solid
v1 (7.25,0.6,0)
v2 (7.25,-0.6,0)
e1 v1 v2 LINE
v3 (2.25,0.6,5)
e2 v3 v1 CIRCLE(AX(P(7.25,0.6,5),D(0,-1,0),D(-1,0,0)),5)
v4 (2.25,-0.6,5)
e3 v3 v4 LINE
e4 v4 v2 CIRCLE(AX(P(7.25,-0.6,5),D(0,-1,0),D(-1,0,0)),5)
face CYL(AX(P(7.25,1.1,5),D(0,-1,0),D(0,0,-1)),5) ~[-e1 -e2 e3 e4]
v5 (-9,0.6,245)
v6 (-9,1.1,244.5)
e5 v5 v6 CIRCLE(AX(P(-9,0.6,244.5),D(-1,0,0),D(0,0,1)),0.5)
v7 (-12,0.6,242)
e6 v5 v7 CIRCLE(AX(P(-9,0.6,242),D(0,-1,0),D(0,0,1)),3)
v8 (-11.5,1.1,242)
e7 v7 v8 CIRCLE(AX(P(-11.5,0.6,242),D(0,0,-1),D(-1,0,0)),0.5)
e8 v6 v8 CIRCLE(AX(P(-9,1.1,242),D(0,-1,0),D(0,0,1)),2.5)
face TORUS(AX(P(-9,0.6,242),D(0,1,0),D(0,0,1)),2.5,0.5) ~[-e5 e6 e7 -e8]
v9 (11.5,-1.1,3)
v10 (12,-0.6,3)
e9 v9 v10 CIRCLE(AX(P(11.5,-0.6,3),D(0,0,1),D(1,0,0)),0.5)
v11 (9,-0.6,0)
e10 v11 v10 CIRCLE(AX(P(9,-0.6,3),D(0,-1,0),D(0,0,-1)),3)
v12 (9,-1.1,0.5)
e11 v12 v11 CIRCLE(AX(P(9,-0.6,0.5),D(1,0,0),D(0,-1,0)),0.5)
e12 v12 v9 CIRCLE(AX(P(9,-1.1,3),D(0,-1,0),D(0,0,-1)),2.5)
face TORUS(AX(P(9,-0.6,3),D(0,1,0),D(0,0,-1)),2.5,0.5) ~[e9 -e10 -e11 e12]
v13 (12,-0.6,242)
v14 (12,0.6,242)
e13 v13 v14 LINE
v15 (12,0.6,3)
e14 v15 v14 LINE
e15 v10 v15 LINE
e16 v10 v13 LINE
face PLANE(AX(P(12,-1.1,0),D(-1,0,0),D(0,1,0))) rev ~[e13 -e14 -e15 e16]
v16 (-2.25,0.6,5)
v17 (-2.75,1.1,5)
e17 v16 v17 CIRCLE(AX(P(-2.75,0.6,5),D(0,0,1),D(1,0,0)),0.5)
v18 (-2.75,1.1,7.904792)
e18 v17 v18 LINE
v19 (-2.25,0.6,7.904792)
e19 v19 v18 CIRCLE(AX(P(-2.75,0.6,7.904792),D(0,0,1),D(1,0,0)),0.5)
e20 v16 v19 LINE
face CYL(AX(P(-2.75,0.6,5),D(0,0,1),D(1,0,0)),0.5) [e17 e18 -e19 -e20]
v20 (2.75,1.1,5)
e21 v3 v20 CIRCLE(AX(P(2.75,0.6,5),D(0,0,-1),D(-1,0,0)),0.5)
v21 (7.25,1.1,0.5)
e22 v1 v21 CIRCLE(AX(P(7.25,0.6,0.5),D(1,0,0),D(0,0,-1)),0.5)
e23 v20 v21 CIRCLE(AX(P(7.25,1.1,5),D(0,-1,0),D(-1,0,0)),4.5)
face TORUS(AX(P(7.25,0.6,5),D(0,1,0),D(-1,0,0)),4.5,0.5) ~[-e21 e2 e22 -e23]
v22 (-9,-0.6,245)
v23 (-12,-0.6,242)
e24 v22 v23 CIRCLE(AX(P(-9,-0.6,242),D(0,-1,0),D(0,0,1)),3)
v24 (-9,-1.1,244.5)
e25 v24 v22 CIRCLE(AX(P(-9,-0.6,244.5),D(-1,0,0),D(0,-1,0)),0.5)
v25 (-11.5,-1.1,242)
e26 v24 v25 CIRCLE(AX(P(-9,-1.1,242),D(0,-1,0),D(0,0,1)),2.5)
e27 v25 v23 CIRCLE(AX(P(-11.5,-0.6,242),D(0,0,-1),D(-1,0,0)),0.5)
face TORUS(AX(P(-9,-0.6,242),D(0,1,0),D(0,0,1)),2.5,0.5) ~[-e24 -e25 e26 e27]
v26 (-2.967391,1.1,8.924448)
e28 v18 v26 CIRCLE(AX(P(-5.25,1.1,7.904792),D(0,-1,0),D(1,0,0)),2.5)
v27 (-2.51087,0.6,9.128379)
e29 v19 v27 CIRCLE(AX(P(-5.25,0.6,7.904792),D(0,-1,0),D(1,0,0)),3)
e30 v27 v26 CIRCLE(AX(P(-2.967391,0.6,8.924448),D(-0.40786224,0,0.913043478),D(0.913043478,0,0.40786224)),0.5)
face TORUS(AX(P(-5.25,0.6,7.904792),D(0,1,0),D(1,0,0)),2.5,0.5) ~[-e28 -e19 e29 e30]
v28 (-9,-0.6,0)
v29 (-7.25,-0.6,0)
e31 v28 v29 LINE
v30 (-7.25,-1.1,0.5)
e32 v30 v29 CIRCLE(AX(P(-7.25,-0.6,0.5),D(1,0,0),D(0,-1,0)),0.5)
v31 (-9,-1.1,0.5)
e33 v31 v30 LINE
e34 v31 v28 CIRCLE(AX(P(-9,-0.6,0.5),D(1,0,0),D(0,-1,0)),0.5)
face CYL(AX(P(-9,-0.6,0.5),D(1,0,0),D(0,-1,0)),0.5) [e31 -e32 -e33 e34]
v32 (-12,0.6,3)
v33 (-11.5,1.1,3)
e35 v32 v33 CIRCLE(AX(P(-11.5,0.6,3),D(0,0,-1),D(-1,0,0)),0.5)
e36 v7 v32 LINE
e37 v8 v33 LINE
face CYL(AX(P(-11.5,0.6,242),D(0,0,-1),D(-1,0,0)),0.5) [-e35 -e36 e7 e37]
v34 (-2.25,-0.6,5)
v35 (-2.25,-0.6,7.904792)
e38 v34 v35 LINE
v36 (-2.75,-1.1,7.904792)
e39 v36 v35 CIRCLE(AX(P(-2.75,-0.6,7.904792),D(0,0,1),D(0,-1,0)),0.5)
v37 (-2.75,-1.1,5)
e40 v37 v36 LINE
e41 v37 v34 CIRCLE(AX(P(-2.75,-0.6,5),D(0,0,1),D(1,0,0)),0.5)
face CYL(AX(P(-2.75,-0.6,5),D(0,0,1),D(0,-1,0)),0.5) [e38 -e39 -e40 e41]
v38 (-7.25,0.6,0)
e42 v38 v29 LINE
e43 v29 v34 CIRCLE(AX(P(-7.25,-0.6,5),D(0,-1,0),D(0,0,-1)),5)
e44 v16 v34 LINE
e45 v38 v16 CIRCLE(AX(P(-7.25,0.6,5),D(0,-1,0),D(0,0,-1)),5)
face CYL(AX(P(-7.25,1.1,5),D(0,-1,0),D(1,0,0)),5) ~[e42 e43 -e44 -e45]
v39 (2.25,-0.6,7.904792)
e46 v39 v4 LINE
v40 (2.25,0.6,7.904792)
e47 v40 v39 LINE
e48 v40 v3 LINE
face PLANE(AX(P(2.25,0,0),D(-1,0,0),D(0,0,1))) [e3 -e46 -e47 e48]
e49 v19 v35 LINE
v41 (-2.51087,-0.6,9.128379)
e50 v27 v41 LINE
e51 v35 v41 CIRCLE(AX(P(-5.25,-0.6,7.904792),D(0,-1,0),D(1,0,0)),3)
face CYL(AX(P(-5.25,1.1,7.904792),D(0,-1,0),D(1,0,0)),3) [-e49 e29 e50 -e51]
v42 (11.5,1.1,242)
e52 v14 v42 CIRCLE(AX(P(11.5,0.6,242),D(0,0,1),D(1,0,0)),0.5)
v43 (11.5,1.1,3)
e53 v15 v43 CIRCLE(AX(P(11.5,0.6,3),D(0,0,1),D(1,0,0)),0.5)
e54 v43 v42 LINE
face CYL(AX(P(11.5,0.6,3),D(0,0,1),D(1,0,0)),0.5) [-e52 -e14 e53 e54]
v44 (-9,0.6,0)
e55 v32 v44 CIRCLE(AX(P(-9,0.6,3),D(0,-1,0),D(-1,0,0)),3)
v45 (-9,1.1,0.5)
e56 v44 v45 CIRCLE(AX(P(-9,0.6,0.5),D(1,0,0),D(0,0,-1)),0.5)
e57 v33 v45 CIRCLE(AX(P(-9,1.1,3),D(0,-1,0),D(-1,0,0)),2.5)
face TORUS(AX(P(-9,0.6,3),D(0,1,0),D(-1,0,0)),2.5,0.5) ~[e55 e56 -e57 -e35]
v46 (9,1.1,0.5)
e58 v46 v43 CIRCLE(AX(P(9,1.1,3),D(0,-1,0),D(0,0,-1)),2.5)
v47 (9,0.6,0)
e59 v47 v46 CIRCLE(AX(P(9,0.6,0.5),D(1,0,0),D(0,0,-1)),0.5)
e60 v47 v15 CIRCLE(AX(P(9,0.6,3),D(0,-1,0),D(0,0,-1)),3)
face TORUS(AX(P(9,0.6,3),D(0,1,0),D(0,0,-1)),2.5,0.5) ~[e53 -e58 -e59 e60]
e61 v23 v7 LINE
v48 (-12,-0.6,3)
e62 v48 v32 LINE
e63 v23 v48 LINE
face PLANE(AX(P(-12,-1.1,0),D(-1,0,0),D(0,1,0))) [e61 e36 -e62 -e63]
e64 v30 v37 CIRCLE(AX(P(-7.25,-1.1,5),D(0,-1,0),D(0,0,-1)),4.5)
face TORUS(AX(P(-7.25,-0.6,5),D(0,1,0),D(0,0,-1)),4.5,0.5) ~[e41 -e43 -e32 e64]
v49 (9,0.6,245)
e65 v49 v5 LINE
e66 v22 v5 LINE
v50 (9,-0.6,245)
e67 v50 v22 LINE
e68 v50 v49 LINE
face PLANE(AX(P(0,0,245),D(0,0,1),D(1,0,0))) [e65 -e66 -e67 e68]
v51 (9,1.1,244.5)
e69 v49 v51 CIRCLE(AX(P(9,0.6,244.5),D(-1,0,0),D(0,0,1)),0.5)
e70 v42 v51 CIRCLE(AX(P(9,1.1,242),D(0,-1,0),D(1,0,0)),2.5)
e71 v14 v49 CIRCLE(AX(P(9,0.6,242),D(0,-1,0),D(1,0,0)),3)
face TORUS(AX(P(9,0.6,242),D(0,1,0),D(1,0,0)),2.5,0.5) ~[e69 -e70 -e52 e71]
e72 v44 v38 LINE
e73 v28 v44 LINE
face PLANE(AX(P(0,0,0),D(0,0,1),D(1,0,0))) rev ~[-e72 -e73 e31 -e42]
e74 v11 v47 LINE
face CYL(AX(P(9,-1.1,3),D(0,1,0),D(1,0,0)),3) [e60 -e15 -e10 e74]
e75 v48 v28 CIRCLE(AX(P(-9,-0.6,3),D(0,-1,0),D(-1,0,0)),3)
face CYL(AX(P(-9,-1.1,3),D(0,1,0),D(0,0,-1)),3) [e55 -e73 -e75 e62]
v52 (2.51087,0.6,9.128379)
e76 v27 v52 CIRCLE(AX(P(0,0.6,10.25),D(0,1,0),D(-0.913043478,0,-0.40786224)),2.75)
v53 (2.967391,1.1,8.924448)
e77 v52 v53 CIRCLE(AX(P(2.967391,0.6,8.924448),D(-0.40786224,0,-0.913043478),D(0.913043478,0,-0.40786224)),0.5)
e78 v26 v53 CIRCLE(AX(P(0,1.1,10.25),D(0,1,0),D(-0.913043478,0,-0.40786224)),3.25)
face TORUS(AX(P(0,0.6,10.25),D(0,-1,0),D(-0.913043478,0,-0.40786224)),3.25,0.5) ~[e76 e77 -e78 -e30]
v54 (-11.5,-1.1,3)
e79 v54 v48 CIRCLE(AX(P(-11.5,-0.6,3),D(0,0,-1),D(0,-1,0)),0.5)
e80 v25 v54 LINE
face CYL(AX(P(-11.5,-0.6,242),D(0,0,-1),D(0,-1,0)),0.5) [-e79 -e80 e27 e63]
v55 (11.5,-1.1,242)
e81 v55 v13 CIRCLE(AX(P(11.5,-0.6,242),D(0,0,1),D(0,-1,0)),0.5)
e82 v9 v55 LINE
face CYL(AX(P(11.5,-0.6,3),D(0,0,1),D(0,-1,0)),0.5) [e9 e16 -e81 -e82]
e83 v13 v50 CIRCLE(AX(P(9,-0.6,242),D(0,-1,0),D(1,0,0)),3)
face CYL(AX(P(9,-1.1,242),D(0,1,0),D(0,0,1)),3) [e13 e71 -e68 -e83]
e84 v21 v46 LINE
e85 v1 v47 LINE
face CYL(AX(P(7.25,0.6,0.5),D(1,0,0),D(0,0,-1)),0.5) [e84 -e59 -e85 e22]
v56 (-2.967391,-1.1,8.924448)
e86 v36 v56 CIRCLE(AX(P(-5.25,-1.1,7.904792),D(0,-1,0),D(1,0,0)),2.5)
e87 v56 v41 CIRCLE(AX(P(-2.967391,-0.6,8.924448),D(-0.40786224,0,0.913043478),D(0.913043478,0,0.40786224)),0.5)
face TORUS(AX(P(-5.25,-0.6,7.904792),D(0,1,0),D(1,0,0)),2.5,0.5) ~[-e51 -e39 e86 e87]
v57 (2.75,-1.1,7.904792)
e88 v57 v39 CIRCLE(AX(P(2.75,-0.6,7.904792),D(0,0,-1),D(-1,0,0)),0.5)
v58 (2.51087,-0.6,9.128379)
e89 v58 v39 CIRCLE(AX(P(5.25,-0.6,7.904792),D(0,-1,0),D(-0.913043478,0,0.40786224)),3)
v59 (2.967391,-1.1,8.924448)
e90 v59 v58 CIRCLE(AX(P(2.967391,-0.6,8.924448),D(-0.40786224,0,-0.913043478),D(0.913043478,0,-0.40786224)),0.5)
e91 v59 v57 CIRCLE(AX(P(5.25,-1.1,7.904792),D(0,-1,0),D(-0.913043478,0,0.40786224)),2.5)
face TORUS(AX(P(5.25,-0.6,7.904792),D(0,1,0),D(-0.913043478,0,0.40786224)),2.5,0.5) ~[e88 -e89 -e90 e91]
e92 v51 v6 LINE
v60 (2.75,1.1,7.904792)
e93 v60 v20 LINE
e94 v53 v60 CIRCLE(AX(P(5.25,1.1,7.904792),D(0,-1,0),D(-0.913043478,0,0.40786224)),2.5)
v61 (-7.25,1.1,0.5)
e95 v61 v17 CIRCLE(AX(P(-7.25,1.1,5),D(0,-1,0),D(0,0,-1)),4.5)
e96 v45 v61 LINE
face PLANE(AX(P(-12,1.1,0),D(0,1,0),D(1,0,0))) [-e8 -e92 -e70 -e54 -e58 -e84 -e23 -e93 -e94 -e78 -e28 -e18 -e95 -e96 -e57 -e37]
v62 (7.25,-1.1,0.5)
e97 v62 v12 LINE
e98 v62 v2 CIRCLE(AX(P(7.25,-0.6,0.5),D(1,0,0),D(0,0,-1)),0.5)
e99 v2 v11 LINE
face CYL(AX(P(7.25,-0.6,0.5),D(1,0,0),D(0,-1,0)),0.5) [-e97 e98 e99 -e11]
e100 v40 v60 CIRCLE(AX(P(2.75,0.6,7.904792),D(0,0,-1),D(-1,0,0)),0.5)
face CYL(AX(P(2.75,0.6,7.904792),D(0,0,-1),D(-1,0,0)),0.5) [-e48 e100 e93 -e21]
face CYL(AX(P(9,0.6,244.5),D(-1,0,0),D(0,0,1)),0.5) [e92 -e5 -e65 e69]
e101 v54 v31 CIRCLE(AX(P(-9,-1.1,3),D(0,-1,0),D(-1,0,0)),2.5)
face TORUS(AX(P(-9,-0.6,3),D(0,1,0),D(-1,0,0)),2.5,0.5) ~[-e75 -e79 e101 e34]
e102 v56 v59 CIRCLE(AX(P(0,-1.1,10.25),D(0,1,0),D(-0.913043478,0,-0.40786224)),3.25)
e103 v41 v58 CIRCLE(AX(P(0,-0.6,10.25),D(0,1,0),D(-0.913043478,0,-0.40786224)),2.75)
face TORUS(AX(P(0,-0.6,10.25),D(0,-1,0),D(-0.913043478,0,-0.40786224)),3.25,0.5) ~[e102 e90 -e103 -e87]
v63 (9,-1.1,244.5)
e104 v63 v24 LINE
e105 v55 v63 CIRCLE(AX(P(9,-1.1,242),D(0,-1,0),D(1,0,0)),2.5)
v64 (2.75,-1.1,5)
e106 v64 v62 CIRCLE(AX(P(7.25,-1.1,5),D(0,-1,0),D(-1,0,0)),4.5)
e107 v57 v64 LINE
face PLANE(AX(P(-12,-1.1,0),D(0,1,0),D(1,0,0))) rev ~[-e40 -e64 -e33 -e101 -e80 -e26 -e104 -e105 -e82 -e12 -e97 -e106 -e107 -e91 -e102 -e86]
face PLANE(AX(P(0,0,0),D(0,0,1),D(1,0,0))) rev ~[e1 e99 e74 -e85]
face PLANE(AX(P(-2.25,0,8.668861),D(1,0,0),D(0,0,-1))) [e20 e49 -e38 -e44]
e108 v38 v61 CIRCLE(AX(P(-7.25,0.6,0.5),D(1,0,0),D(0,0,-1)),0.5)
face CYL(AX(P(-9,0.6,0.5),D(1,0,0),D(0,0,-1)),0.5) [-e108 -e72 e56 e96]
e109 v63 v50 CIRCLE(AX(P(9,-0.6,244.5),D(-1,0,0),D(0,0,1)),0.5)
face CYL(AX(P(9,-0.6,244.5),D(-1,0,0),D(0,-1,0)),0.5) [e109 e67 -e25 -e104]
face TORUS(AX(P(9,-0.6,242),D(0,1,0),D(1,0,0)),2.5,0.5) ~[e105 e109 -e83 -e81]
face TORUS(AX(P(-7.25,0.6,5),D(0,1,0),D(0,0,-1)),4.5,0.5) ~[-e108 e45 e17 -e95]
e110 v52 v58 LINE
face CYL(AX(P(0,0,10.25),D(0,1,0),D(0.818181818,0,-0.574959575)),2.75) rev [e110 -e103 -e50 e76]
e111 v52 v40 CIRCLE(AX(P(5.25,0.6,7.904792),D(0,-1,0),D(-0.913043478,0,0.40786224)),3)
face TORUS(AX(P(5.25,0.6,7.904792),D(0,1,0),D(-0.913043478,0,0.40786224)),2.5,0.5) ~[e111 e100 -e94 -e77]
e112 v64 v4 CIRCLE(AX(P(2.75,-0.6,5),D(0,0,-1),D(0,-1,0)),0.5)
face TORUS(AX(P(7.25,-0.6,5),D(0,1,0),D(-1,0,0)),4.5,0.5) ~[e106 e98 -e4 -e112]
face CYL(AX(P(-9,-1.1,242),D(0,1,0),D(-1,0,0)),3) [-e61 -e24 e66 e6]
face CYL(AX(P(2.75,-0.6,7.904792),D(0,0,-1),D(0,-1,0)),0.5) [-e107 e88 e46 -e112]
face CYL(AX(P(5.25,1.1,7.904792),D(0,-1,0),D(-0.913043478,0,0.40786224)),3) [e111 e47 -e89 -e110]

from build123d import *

# Parameters (mm, degrees)
F0_W          = 24
F0_H          = 2.2
F1_DEPTH      = 245
F3_DEPTH      = 1.101
F3_DEPTH_BACK = 1.101
F4_R          = 5
F5_R          = 3
F6_R          = 3
F7_R          = 0.5


with BuildPart() as f1:
    # F0 (on Top) → F1 (new body)
    with BuildSketch(Plane.XY):
        Rectangle(F0_W, F0_H)
    extrude(amount=F1_DEPTH)

    # F2 (on Front) → F3 (cut, two sides)
    with BuildSketch(Plane.XZ) as f3_sk:
        with BuildLine():
            Line((2.25, 0), (2.25, 8.6688611699))
            ThreePointArc((2.25, 8.6688611699), (0, 13), (-2.25, 8.6688611699))
            Line((-2.25, 8.6688611699), (-2.25, 0))
            Line((-2.25, 0), (2.25, 0))
        make_face()
    extrude(amount=-F3_DEPTH, mode=Mode.SUBTRACT)
    extrude(f3_sk.sketch, amount=F3_DEPTH_BACK, mode=Mode.SUBTRACT)

    # F4
    f4_edges = [f1.edges().sort_by_distance(p)[0] for p in [
        (2.25, 0, 0),
        (-2.25, 0, 0),
    ]]
    fillet(f4_edges, radius=F4_R)

    # F5
    f5_edges = [f1.edges().sort_by_distance(p)[0] for p in [
        (-2.25, 0, 8.668861),
        (2.25, 0, 8.668861),
    ]]
    fillet(f5_edges, radius=F5_R)

    # F6
    f6_edges = [f1.edges().sort_by_distance(p)[0] for p in [
        (12, 0, 245),
        (-12, 0, 245),
        (-12, 0, 0),
        (12, 0, 0),
    ]]
    fillet(f6_edges, radius=F6_R)

    # F7
    f7_edges = [f1.edges().sort_by_distance(p)[0] for p in [
        (-8.125, -1.1, 0),
        (-11.12132, -1.1, 0.87868),
        (-3.714466, -1.1, 1.464466),
        (-12, -1.1, 122.5),
        (-2.25, -1.1, 6.452396),
        (-11.12132, -1.1, 244.12132),
        (-2.315942, -1.1, 8.530335),
        (0, -1.1, 245),
        (0, -1.1, 13),
        (11.12132, -1.1, 244.12132),
        (2.315942, -1.1, 8.530335),
        (12, -1.1, 122.5),
        (2.25, -1.1, 6.452396),
        (11.12132, -1.1, 0.87868),
        (3.714466, -1.1, 1.464466),
        (8.125, -1.1, 0),
        (-8.125, 1.1, 0),
        (-11.12132, 1.1, 0.87868),
        (-3.714466, 1.1, 1.464466),
        (-12, 1.1, 122.5),
        (-2.25, 1.1, 6.452396),
        (-11.12132, 1.1, 244.12132),
        (-2.315942, 1.1, 8.530335),
        (0, 1.1, 245),
        (0, 1.1, 13),
        (11.12132, 1.1, 244.12132),
        (2.315942, 1.1, 8.530335),
        (12, 1.1, 122.5),
        (2.25, 1.1, 6.452396),
        (11.12132, 1.1, 0.87868),
        (3.714466, 1.1, 1.464466),
        (8.125, 1.1, 0),
    ]]
    fillet(f7_edges, radius=F7_R)


solid = f1.part
